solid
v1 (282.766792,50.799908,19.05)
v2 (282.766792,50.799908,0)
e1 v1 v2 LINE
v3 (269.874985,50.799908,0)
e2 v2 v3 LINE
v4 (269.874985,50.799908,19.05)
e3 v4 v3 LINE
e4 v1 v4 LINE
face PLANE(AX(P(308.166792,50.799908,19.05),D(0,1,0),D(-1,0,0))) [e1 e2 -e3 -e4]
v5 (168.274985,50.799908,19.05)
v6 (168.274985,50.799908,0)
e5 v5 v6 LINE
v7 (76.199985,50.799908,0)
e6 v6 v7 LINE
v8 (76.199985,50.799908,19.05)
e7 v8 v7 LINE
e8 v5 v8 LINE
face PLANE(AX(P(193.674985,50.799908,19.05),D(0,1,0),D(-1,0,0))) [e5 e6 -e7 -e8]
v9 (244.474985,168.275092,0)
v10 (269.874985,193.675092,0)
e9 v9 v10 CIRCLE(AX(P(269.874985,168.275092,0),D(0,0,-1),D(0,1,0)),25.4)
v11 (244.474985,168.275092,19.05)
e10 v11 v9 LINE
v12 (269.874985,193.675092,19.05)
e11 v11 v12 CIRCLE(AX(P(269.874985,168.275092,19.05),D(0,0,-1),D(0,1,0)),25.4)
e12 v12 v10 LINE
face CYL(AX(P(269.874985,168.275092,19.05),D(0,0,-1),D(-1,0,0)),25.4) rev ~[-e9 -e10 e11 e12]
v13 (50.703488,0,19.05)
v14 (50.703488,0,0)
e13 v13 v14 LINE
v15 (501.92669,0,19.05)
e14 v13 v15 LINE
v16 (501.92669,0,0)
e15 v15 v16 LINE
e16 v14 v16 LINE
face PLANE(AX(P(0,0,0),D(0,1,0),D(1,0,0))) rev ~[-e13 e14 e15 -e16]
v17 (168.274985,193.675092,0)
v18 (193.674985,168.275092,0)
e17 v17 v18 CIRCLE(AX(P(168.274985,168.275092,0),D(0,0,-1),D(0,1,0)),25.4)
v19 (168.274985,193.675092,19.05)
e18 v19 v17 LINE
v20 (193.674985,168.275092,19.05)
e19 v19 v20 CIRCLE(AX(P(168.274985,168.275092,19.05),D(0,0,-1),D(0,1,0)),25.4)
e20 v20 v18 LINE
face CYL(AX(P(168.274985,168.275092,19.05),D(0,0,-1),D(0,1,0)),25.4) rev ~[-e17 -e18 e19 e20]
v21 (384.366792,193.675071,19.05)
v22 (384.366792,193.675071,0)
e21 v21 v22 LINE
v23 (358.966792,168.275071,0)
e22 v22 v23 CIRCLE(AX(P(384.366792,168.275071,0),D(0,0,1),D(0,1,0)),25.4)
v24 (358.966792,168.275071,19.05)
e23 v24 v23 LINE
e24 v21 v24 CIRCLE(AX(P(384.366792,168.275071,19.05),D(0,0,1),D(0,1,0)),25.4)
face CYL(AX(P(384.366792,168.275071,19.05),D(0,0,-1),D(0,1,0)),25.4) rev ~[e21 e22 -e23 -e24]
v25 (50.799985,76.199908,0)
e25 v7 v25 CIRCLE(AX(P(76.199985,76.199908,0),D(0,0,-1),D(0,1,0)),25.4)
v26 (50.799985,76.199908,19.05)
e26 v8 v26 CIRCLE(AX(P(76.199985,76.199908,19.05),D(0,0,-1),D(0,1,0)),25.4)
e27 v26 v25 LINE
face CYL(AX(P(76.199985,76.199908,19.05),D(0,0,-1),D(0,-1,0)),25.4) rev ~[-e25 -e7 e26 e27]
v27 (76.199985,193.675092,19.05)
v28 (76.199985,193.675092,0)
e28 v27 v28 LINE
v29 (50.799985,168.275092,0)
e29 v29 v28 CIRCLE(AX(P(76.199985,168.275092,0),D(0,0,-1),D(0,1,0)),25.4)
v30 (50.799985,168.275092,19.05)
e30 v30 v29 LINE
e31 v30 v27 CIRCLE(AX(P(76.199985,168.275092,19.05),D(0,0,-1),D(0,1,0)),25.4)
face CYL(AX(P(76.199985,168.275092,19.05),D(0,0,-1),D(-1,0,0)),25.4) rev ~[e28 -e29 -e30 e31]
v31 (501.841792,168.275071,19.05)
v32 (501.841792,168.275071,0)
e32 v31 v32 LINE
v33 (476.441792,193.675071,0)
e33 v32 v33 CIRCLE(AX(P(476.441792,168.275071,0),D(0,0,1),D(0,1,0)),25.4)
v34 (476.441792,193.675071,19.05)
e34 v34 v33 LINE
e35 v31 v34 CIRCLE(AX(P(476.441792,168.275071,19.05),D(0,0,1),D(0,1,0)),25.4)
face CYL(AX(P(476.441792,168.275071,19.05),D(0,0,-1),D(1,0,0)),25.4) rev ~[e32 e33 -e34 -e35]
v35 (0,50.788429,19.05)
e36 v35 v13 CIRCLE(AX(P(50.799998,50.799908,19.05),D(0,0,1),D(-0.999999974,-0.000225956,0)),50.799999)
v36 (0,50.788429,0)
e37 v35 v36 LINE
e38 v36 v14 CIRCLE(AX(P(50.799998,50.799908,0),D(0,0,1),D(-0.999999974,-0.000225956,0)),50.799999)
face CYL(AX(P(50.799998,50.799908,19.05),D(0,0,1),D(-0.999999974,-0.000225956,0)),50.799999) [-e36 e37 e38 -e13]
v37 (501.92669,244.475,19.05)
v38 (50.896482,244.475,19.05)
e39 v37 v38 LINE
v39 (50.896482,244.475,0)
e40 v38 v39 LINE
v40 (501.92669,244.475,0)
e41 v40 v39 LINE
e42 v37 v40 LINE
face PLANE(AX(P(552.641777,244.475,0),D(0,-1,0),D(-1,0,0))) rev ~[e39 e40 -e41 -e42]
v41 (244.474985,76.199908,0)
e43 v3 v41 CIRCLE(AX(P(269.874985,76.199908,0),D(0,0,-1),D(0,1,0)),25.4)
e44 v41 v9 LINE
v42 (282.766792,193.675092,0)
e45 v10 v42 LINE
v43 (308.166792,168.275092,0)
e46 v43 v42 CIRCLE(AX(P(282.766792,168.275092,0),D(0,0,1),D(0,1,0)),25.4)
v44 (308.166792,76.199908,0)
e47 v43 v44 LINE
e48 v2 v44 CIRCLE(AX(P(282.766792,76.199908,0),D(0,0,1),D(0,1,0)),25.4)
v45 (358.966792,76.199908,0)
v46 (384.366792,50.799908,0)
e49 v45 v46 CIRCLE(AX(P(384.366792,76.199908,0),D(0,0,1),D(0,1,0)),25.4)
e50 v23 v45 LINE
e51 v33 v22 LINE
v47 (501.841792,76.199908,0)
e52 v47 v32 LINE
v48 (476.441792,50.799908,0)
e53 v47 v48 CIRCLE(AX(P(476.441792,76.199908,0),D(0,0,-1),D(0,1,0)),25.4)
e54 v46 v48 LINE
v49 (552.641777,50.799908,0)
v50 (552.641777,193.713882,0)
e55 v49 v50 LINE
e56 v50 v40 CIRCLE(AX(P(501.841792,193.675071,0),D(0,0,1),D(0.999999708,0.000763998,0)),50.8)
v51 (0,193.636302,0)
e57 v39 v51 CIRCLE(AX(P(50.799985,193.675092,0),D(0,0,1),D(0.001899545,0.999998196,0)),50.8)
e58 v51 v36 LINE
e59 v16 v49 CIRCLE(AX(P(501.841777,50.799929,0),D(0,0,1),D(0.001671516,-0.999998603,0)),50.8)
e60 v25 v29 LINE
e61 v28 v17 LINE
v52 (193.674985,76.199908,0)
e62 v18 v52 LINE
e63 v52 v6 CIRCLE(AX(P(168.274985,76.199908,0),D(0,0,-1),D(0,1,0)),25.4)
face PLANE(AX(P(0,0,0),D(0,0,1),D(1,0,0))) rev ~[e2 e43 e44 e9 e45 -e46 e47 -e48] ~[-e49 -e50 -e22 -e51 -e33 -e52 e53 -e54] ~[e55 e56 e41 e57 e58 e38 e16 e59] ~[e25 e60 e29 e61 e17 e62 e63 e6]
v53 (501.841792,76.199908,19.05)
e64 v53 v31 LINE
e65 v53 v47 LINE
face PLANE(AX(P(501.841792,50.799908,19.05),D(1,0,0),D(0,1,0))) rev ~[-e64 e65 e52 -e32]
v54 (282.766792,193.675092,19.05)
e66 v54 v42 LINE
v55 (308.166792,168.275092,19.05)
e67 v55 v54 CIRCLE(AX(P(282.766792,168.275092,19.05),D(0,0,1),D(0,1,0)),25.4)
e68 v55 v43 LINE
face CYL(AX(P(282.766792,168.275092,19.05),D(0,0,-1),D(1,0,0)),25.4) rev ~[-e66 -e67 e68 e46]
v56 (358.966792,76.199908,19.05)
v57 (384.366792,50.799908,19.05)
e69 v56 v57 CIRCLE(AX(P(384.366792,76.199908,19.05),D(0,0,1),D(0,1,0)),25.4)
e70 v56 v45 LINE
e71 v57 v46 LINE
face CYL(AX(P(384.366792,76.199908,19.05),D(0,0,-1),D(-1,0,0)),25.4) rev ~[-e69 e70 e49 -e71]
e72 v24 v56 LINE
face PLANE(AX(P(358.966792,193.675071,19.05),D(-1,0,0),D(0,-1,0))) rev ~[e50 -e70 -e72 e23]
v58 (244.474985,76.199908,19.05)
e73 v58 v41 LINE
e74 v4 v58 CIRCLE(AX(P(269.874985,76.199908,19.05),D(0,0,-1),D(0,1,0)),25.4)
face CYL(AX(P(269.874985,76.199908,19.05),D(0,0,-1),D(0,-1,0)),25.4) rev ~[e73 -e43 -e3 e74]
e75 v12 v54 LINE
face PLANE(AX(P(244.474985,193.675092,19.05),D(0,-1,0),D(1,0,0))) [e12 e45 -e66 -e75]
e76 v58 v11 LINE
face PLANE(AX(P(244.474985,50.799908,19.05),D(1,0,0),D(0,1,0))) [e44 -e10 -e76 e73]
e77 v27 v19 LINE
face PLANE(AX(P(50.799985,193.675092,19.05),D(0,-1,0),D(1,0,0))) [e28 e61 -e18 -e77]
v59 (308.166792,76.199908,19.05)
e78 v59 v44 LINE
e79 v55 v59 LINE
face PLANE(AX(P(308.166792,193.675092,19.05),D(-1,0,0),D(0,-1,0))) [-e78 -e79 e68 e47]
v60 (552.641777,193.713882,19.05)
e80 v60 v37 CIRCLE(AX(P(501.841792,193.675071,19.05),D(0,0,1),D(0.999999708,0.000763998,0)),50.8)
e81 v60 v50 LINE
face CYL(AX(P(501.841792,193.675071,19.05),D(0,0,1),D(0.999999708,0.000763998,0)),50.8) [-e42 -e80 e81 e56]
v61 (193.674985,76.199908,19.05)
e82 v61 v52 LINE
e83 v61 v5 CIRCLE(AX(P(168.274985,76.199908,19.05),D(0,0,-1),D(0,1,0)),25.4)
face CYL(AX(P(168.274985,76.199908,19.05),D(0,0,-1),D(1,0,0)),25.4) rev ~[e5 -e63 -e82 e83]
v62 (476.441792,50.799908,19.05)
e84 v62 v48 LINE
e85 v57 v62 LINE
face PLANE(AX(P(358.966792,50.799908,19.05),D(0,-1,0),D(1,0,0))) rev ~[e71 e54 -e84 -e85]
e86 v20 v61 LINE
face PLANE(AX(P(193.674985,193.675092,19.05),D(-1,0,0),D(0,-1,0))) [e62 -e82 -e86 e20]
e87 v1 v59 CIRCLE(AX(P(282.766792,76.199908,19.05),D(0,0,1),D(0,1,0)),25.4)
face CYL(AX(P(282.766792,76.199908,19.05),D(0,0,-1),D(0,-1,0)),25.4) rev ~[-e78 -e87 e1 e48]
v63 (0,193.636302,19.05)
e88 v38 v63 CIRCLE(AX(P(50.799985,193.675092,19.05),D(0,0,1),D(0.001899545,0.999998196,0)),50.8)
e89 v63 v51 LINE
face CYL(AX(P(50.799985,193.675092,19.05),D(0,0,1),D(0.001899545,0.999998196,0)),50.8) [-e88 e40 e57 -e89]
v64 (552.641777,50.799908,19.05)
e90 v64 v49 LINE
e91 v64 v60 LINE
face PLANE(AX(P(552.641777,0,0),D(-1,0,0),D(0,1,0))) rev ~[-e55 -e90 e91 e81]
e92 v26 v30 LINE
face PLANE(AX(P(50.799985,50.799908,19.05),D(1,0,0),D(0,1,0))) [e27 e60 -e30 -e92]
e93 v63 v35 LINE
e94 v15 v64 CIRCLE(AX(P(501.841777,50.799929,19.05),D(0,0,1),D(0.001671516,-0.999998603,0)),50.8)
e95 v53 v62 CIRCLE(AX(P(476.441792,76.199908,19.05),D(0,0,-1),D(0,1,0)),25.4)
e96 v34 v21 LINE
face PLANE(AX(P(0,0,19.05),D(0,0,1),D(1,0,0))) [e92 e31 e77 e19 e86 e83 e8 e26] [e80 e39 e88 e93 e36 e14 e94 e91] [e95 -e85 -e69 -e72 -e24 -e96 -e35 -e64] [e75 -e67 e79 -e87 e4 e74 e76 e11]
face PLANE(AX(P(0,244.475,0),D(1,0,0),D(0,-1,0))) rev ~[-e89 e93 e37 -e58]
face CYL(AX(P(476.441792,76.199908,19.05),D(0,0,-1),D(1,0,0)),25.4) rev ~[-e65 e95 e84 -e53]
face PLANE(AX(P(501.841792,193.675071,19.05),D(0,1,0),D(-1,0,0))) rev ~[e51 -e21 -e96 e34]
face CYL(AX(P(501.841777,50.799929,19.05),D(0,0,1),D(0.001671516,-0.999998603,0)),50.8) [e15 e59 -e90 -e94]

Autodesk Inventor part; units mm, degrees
ref_plane "YZ Plane" through (0, 0, 0) normal (1, 0, 0) x (0, 1, 0)
ref_plane "XZ Plane" through (0, 0, 0) normal (0, 1, 0) x (-1, 0, 0)
ref_plane "XY Plane" through (0, 0, 0) normal (0, 0, 1) x (1, 0, 0)
sketch "Sketch2" plane through (0, 0, 0) normal (0, 0, 1) x (1, 0, 0)
  line L0 (0, 0) -> (552.641777, 0)
  line L1 (552.641777, 0) -> (552.641777, 244.475)
  line L2 (552.641777, 244.475) -> (0, 244.475)
  line L3 (0, 244.475) -> (0, 0)
  dimension "d6" = 244.475
extrude "Extrusion1" add sketch "Sketch2" along normal blind 19.05
sketch "Sketch3" plane through (0, 0, 19.05) normal (0, 0, 1) x (1, 0, 0)
  line L0 (0, 0) -> (552.641777, 0)
  line L1 (552.641777, 0) -> (552.641777, 244.475)
  line L2 (552.641777, 244.475) -> (0, 244.475)
  line L3 (0, 244.475) -> (0, 0)
  arc A0 (50.896482, 244.475) -> (0, 193.636302) centre (50.799985, 193.675092) ccw
  dimension "d9" = 50.8
sketch "Sketch3 outline for Extrusion2" plane through (0, 0, 19.05) normal (0, 0, 1) x (1, 0, 0)
  arc A0 (50.896482, 244.475) -> (0, 193.636302) centre (50.799985, 193.675092) ccw
  line L0 (0, 244.475) -> (0, 193.636302)
  line L1 (50.896482, 244.475) -> (0, 244.475)
extrude "Extrusion2" cut sketch "Sketch3 outline for Extrusion2" against normal blind 19.05
sketch "Sketch4" plane through (0, 0, 19.05) normal (0, 0, 1) x (1, 0, 0)
  line L0 (0, 193.713882) -> (0, 0)
  line L1 (0, 0) -> (552.641777, 0)
  line L2 (552.641777, 0) -> (552.641777, 244.475)
  line L3 (552.641777, 244.475) -> (50.703488, 244.475)
  arc A0 (552.641777, 193.713882) -> (500.210663, 244.475) centre (501.841779, 193.701193) ccw
  arc A1 (501.841779, 0) -> (552.641777, 50.788429) centre (501.841778, 50.8) ccw
  arc A2 (0, 50.788429) -> (50.703488, 0) centre (50.799999, 50.799908) ccw
  dimension "d15" = 50.8
  dimension "d16" = 50.8
  dimension "d17" = 50.8
extrude "Extrusion3" cut sketch "Sketch4" against normal blind 19.05 contours A2 L1 L0
sketch "Sketch5" plane through (0, 0, 19.05) normal (0, 0, 1) x (1, 0, 0)
  line L0 (552.641777, 0) -> (552.641777, 244.475)
  line L1 (552.641777, 244.475) -> (50.703488, 244.475)
  arc A0 (552.641777, 193.713882) -> (501.92669, 244.475) centre (501.841792, 193.675071) ccw
  point P0 (0, 0)
  dimension "d20" = 50.8
extrude "Extrusion4" cut sketch "Sketch5" against normal blind 19.05
sketch "Sketch6" plane through (0, 0, 19.05) normal (0, 0, 1) x (1, 0, 0)
  line L0 (50.703488, 0) -> (552.641777, 0)
  line L1 (552.641777, 0) -> (552.641777, 193.713882)
  arc A0 (501.92669, 0) -> (552.641777, 50.799908) centre (501.841777, 50.799929) ccw
  point P0 (0, 0)
  dimension "d23" = 50.8
extrude "Extrusion5" cut sketch "Sketch6" against normal blind 19.05
sketch "Sketch7" plane through (0, 0, 19.05) normal (0, 0, 1) x (1, 0, 0)
  arc A0 (552.641777, 193.713882) -> (501.92669, 244.475) centre (501.841792, 193.675071) ccw
  arc A1 (50.703488, 244.475) -> (0, 193.713882) centre (50.799985, 193.675092) ccw
  line L0 (50.799985, 193.675092) -> (193.674985, 193.675092)
  line L1 (193.674985, 193.675092) -> (193.674985, 50.799908)
  line L2 (193.674985, 50.799908) -> (50.799985, 50.799908)
  line L3 (50.799985, 50.799908) -> (50.799985, 193.675092)
  line L4 (501.841792, 193.675071) -> (358.966792, 193.675071)
  line L5 (358.966792, 193.675071) -> (358.966792, 50.799908)
  line L6 (358.966792, 50.799908) -> (501.841792, 50.799908)
  line L7 (501.841792, 50.799908) -> (501.841792, 193.675071)
  point P0 (0, 0)
  dimension "d26" = 142.875
  dimension "d27" = 142.875
extrude "Extrusion6" cut sketch "Sketch7" against normal blind 19.05 contours L0 L1 L2 L3
sketch "Sketch8" plane through (0, 0, 19.05) normal (0, 0, 1) x (1, 0, 0)
  arc A0 (552.641777, 193.713882) -> (501.92669, 244.475) centre (501.841792, 193.675071) ccw
  line L0 (501.841792, 193.675071) -> (358.966792, 193.675071)
  line L1 (358.966792, 193.675071) -> (358.966792, 50.799908)
  line L2 (358.966792, 50.799908) -> (501.841792, 50.799908)
  line L3 (501.841792, 50.799908) -> (501.841792, 193.675071)
  point P0 (0, 0)
  dimension "d30" = 142.875
extrude "Extrusion7" cut sketch "Sketch8" against normal blind 19.05
sketch "Sketch9" plane through (0, 0, 19.05) normal (0, 0, 1) x (1, 0, 0)
  line L0 (244.474985, 193.675092) -> (308.166792, 193.675092)
  line L1 (308.166792, 193.675092) -> (308.166792, 50.799908)
  line L2 (308.166792, 50.799908) -> (244.474985, 50.799908)
  line L3 (244.474985, 50.799908) -> (244.474985, 193.675092)
  point P0 (193.674985, 193.675092)
  point P1 (0, 0)
  dimension "d33" = 50.8
extrude "Extrusion8" cut sketch "Sketch9" against normal blind 19.05
fillet "Fillet1" radius 25.4 1 edges at (50.8, 193.6751, 9.525)
fillet "Fillet2" radius 25.4 1 edges at (193.675, 193.6751, 9.525)
fillet "Fillet3" radius 25.4 1 edges at (308.1668, 193.6751, 9.525)
fillet "Fillet4" radius 25.4 1 edges at (501.8418, 193.6751, 9.525)
fillet "Fillet5" radius 25.4 1 edges at (501.8418, 50.7999, 9.525)
fillet "Fillet6" radius 25.4 1 edges at (358.9668, 193.6751, 9.525)
fillet "Fillet7" radius 25.4 1 edges at (358.9668, 50.7999, 9.525)
fillet "Fillet8" radius 25.4 1 edges at (244.475, 50.7999, 9.525)
fillet "Fillet9" radius 25.4 1 edges at (244.475, 193.6751, 9.525)
fillet "Fillet10" radius 25.4 1 edges at (193.675, 50.7999, 9.525)
fillet "Fillet11" radius 25.4 1 edges at (308.1668, 50.7999, 9.525)
fillet "Fillet12" radius 25.4 1 edges at (50.8, 50.7999, 9.525)
properties part number "ROV-Side Panel" material "Acetal Resin, Black"
